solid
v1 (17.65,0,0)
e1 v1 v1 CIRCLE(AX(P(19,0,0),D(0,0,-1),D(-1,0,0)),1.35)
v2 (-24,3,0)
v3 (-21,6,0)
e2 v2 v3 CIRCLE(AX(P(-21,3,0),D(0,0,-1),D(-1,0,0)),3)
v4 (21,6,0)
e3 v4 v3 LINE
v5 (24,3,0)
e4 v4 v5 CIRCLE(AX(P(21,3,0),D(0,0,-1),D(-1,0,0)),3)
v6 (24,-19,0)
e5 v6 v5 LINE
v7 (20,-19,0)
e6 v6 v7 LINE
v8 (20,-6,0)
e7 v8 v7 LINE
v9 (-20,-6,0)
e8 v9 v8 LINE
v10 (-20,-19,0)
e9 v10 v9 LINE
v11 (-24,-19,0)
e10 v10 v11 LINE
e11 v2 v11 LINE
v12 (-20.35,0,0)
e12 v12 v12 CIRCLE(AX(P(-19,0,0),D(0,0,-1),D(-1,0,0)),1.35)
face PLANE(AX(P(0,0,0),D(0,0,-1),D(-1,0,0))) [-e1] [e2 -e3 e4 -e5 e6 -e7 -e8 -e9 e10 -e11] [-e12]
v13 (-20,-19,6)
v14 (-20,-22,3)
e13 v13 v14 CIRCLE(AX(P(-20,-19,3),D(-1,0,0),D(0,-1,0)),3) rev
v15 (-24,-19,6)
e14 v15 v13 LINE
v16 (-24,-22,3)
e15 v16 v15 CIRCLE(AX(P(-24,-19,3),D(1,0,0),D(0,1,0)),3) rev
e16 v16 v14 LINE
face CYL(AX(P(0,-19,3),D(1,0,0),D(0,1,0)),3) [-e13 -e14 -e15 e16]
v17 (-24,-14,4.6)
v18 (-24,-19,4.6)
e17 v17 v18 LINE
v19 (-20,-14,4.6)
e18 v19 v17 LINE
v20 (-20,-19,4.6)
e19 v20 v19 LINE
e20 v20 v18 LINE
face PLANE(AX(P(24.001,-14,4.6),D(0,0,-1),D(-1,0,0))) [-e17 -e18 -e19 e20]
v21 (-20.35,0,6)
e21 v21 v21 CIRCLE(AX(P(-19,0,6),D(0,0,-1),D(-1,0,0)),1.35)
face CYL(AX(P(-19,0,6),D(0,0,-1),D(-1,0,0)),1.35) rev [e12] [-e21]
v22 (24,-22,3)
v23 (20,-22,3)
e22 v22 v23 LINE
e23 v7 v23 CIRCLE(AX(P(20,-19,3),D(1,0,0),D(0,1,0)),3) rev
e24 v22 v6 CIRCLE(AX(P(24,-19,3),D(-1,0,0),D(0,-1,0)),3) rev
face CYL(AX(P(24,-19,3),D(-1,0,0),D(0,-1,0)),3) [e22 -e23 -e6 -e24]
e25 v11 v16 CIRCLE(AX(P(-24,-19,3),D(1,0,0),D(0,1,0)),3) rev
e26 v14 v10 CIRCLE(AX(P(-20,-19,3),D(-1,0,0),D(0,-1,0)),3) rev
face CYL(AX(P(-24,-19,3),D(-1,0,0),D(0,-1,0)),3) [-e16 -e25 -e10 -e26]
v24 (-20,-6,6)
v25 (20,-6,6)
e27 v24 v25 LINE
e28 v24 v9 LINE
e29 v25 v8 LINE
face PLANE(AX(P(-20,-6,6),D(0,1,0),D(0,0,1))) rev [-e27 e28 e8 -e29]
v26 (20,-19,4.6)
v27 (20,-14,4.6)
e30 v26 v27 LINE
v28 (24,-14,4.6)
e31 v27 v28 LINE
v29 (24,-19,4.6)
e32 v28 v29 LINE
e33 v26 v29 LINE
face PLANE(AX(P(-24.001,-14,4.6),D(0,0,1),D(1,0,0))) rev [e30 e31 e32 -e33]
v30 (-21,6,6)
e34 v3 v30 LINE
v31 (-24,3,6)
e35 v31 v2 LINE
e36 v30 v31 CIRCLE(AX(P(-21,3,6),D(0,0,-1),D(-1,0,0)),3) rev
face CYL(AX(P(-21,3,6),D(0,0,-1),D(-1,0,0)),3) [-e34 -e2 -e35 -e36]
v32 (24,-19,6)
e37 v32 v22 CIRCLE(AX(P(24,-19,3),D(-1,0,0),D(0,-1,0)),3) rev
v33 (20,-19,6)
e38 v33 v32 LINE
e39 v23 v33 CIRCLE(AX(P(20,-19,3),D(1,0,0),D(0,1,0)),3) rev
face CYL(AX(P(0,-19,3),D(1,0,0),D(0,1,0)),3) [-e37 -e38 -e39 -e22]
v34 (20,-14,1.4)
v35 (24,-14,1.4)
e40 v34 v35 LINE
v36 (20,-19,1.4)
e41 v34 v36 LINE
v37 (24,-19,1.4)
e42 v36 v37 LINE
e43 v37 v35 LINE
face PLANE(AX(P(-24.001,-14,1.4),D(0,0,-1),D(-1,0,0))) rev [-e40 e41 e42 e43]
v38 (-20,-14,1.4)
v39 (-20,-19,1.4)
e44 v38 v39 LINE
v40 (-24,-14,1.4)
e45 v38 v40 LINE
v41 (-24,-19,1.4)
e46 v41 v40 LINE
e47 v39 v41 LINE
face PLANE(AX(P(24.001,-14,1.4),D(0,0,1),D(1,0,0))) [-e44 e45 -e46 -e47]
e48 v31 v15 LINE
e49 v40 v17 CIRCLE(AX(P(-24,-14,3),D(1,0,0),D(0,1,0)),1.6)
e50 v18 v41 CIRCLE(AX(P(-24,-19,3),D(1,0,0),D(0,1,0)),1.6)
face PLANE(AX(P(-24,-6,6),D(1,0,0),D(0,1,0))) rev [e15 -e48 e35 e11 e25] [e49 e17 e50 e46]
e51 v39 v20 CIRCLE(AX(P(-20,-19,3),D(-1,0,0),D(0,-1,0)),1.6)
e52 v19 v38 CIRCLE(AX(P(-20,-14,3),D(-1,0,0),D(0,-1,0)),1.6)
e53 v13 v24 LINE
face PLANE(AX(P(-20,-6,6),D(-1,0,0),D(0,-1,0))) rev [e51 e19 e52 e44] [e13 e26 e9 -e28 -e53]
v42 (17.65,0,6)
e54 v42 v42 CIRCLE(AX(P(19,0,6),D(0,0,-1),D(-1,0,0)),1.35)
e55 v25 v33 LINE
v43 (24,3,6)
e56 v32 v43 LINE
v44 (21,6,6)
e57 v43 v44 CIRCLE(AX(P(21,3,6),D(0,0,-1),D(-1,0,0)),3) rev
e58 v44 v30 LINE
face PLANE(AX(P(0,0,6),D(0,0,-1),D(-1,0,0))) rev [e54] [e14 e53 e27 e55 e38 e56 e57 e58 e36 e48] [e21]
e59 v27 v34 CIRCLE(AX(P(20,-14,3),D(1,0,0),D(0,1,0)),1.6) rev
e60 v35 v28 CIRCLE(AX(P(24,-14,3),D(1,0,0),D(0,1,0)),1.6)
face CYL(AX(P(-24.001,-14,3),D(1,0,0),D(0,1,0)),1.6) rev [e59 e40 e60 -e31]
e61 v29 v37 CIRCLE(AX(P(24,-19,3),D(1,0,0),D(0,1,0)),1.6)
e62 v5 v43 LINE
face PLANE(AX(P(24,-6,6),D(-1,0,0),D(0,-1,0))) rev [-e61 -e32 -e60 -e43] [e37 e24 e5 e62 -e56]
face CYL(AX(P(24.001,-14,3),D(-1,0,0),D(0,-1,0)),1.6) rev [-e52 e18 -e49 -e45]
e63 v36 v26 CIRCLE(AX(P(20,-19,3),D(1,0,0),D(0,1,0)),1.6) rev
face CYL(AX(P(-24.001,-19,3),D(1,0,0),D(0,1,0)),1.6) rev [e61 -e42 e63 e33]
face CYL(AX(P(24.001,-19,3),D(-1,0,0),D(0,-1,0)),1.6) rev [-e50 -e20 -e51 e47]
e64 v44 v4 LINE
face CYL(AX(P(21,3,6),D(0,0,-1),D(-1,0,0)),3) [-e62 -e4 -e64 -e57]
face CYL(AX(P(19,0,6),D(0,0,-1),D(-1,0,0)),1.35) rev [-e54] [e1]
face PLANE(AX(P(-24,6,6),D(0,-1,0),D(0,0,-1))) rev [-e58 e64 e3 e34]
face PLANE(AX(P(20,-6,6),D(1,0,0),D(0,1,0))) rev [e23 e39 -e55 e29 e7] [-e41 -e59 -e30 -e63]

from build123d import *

# Parameters (mm, degrees)
EXTRUDE_1_DEPTH     = 6
CUT_EXTRUDE_1_REACH = 55.141
FILLET_1_R          = 3
SKETCH_3_R          = 1.35
CUT_EXTRUDE_2_DEPTH = 34.105890714


with BuildPart() as part:
    # 草圖1 → 填料-伸長1 (new body)
    with BuildSketch(Plane.XY):
        Polygon((-20, -6), (20, -6), (20, -22), (24, -22), (24, -6), (24, 6), (-24, 6), (-24, -6), (-24, -22), (-20, -22), align=None)
    extrude(amount=EXTRUDE_1_DEPTH)

    # 草圖2 → 除料-伸長1 (cut, up to next)
    with BuildSketch(Plane(origin=(24, 0, 0), x_dir=(0, 0, -1), z_dir=(1, 0, 0)), mode=Mode.PRIVATE) as cut_extrude_1_sk1:
        with BuildLine():
            Line((-1.4, -14), (-1.4, -19))
            ThreePointArc((-1.4, -19), (-3, -20.6), (-4.6, -19))
            Line((-4.6, -19), (-4.6, -14))
            ThreePointArc((-4.6, -14), (-3, -12.4), (-1.4, -14))
        make_face()
    cut_extrude_1_tool1 = extrude(cut_extrude_1_sk1.sketch, amount=-CUT_EXTRUDE_1_REACH, mode=Mode.PRIVATE) & part.part
    cut_extrude_1 = cut_extrude_1_tool1.solids().sort_by_distance((24, -16.5, 3))[0]
    add(cut_extrude_1, mode=Mode.SUBTRACT)

    # 鏡射1: 除料-伸長1 across plane
    add(cut_extrude_1.mirror(Plane(origin=(0, 0, 0), x_dir=(0, 0, 1), z_dir=(1, 0, 0))), mode=Mode.SUBTRACT)

    # 圓角1
    fillet_1_edges = [part.edges().sort_by_distance(p)[0] for p in [
        (-24, 6, 3),
        (24, 6, 3),
        (-22, -22, 6),
        (-22, -22, 0),
        (22, -22, 0),
        (22, -22, 6),
    ]]
    fillet(fillet_1_edges, radius=FILLET_1_R - 0.0001)  # a hair under: the kernel refuses the full size

    # 草圖3 → 除料-伸長2 (cut, through all)
    with BuildSketch(Plane(origin=(0, 0, 0), x_dir=(-1, 0, 0), z_dir=(0, 0, -1))):
        with Locations((19, 0)):
            Circle(SKETCH_3_R)
        with Locations((-19, 0)):
            Circle(SKETCH_3_R)
    extrude(amount=-CUT_EXTRUDE_2_DEPTH, mode=Mode.SUBTRACT)


solid = part.part
